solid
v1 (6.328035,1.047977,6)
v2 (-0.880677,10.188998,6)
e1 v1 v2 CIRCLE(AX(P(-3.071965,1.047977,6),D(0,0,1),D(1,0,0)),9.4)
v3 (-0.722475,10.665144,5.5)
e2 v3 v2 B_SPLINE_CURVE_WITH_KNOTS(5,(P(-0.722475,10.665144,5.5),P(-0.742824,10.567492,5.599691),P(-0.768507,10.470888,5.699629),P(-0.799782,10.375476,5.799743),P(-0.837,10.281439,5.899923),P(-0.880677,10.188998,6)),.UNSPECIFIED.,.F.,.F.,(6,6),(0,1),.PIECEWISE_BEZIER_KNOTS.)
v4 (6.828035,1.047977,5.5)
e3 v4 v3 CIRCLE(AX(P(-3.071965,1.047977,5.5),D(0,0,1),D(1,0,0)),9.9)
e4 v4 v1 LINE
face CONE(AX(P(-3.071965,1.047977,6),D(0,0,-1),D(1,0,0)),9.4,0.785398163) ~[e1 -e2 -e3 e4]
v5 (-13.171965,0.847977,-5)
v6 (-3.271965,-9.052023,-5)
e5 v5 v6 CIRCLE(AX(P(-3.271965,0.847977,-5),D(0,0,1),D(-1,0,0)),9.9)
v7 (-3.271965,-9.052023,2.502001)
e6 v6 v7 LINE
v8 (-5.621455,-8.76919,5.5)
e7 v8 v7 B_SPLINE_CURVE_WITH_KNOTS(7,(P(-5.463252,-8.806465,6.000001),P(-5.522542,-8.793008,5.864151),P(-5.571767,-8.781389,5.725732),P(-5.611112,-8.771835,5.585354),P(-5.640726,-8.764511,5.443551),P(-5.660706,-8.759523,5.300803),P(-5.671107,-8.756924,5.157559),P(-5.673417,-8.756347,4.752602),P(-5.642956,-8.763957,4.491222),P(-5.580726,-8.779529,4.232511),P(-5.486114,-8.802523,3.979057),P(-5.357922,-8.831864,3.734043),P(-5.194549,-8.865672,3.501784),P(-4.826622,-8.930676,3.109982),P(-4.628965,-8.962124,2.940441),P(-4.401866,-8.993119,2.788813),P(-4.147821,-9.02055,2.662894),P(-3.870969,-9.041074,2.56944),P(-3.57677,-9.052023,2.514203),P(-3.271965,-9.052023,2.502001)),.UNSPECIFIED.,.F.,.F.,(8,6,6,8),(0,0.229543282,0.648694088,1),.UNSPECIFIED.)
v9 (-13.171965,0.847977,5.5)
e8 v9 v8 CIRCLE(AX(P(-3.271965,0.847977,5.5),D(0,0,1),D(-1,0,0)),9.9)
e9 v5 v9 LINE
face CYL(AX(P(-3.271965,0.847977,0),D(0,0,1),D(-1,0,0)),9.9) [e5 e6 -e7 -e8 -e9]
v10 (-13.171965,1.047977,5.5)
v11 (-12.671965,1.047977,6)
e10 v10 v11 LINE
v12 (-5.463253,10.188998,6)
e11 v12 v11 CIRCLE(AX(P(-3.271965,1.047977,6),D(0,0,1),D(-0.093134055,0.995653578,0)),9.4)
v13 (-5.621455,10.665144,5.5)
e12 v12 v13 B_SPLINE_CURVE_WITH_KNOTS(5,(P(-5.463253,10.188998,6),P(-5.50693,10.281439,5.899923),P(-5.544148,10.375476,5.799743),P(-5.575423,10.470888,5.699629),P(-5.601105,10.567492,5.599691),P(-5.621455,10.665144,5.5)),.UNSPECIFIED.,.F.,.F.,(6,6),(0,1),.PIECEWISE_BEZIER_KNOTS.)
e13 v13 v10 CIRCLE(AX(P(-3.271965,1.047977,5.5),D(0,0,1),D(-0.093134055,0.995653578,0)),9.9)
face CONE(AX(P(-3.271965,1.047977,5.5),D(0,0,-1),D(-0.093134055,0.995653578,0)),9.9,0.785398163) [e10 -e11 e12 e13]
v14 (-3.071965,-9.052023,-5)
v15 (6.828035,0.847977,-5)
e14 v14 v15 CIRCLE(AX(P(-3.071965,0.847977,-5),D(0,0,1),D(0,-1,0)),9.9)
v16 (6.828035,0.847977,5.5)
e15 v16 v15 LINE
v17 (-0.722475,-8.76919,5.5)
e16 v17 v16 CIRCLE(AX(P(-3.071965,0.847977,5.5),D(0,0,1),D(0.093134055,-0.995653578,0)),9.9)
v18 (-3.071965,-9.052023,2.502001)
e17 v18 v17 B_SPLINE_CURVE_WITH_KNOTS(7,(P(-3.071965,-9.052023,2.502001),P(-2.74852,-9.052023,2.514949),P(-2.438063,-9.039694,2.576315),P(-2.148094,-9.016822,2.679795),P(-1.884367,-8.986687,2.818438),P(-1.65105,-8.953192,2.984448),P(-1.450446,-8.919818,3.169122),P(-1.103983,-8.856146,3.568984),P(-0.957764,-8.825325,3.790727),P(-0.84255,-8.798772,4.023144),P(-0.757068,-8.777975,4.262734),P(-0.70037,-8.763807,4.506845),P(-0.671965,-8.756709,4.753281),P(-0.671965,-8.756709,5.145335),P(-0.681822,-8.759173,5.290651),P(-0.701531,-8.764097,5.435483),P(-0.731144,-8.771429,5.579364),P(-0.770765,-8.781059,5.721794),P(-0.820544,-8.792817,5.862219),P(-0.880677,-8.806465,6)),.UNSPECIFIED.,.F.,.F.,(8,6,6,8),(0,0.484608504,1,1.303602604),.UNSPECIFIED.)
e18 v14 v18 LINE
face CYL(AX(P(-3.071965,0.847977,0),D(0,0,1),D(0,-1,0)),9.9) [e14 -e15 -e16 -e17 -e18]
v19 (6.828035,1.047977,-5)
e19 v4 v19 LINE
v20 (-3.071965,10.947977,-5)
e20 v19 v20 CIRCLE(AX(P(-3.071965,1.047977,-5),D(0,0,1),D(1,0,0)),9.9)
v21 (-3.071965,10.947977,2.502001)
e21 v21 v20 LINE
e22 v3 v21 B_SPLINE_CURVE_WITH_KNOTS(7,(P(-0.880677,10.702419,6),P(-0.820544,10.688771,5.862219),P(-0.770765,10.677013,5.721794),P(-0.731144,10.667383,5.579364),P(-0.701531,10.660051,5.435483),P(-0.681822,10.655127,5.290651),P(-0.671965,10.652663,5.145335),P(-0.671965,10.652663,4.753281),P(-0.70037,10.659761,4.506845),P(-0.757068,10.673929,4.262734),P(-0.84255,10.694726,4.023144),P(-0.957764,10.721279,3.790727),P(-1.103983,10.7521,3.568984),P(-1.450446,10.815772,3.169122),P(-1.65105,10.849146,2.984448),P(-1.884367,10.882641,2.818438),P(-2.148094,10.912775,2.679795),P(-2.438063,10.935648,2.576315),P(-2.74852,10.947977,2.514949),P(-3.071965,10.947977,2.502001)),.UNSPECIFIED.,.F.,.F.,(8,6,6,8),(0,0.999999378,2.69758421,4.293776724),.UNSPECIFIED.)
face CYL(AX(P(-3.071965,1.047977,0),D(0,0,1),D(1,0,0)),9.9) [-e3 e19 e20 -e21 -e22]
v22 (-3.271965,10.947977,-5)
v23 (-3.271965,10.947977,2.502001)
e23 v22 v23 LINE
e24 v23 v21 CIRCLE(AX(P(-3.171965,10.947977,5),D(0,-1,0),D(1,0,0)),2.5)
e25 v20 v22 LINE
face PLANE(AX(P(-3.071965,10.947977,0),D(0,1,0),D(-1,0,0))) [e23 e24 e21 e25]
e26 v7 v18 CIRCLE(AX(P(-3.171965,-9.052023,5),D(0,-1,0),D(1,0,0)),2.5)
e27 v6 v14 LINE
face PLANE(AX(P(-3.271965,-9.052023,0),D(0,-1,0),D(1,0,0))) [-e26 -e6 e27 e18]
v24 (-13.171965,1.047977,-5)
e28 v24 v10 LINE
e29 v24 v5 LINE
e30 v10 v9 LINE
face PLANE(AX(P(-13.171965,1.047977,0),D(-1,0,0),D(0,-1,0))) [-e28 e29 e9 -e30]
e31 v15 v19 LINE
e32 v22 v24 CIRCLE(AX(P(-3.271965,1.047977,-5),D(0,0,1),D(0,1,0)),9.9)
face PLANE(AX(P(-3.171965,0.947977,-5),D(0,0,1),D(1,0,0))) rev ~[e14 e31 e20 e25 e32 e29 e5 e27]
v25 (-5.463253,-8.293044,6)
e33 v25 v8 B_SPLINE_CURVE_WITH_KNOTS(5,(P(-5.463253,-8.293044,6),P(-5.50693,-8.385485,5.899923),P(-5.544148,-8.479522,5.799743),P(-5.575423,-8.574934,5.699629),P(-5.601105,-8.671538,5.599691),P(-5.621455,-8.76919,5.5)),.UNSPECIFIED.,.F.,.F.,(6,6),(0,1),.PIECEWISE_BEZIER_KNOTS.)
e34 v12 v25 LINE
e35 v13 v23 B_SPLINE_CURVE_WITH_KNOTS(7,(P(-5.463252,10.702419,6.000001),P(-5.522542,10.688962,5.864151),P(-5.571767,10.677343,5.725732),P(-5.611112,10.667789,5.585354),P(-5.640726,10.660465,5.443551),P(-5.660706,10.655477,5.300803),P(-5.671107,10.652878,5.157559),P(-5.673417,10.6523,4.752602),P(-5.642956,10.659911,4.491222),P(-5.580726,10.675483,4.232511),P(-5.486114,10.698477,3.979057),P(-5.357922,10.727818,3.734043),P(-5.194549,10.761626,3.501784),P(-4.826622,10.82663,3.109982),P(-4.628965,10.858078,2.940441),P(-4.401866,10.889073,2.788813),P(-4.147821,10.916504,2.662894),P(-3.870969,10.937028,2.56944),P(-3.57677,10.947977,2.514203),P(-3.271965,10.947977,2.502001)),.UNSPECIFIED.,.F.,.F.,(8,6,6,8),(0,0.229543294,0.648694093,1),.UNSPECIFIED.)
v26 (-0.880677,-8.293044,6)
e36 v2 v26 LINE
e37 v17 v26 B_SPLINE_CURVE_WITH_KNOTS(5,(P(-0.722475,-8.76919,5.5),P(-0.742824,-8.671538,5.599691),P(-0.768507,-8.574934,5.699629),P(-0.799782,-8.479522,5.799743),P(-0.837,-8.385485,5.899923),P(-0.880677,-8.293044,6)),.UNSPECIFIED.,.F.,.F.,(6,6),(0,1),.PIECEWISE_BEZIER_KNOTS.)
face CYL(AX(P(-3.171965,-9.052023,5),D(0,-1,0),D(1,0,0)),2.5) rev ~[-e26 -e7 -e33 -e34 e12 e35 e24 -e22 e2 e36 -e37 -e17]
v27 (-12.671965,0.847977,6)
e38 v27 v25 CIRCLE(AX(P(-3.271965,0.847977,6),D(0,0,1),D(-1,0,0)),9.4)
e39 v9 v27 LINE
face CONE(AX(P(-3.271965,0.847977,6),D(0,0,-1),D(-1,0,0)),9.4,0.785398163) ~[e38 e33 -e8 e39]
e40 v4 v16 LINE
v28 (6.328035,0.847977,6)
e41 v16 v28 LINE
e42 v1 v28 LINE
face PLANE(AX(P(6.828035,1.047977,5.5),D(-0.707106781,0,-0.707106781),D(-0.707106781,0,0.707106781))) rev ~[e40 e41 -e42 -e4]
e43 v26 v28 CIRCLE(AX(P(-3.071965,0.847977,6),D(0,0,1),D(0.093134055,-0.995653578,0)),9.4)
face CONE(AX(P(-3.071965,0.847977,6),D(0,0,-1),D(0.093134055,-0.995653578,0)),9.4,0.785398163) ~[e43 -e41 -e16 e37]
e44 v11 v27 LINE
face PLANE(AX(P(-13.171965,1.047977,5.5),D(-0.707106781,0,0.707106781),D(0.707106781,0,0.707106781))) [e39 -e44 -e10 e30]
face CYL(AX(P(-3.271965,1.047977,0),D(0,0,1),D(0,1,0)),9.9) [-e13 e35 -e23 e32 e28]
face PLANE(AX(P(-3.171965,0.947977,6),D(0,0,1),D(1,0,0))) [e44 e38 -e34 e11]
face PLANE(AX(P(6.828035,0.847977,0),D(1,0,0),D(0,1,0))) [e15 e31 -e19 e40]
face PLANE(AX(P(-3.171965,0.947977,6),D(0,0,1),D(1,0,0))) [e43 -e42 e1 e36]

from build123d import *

# Parameters (mm, degrees)
F1_DEPTH     = 6
F2_R         = 2.5
F3_DEPTH     = 25
F4_T1_DEPTH  = 0.2
F4_T4_ANGLE  = 84.656067133
F4_T6_ANGLE  = 84.656067133
F4_T8_ANGLE  = 84.656067133
F4_T10_ANGLE = 84.656067133
F5_DEPTH     = 5


# Not quite as in the source:
# - a fillet or chamfer that OpenCascade refuses, or shapes differently, is made with other operations: its cross-section is extruded or revolved along the edge and cut away or added


with BuildPart() as f1:
    # F0 (on Top) → F1 (new body)
    with BuildSketch(Plane.XY):
        with BuildLine():
            Line((-3.071964772, 10.9479769804), (-3.271964772, 10.9479769804))
            ThreePointArc((-3.271964772, 10.9479769804), (-10.2723219058, 8.0483341141), (-13.171964772, 1.0479769804))
            Line((-13.171964772, 1.0479769804), (-13.171964772, 0.8479769804))
            ThreePointArc((-13.171964772, 0.8479769804), (-10.2723219058, -6.1523801534), (-3.271964772, -9.0520230196))
            Line((-3.271964772, -9.0520230196), (-3.071964772, -9.0520230196))
            ThreePointArc((-3.071964772, -9.0520230196), (3.9283923617, -6.1523801534), (6.828035228, 0.8479769804))
            Line((6.828035228, 0.8479769804), (6.828035228, 1.0479769804))
            ThreePointArc((6.828035228, 1.0479769804), (3.9283923617, 8.0483341141), (-3.071964772, 10.9479769804))
        make_face()
    extrude(amount=F1_DEPTH)

    # F2 (on face) → F3 (cut)
    with BuildSketch(Plane.XZ.offset(9.0520230196)):
        with Locations((-3.171964772, 5)):
            Circle(F2_R)
    extrude(amount=-F3_DEPTH, mode=Mode.SUBTRACT)

    # F4: chamfer of 0.5 on 2 edges, made by hand

    # F4_s2 → F4_t1 (cut)
    with BuildSketch(Plane.XZ.offset(-1.0479769804)):
        Polygon((-13.171964772, 5.5), (-12.671964772, 6), (-13.171964772, 6), align=None)
        Polygon((6.828035228, 5.5), (6.328035228, 6), (6.828035228, 6), align=None)
    extrude(amount=F4_T1_DEPTH, mode=Mode.SUBTRACT)

    # F4_s3 → F4_t4 (revolve, cut)
    with BuildSketch(Plane.XZ.offset(-1.0479769804)):
        Polygon((6.328035228, 6), (6.828035228, 5.5), (6.828035228, 6), align=None)
    revolve(axis=Axis((-3.071964772, 1.0479769804, 6), (0, 0, 1)), revolution_arc=F4_T4_ANGLE, mode=Mode.SUBTRACT)

    # F4_s5 → F4_t6 (revolve, cut)
    with BuildSketch(Plane(origin=(-3.1464057809, -0.2943167545, 0), x_dir=(0, 0, 1), z_dir=(0.9956535782, 0.0931340552, 0))):
        Polygon((5.5, -11.2481533781), (6, -10.7481533781), (6, -11.2481533781), align=None)
    revolve(axis=Axis((-3.271964772, 1.0479769804, 6), (0, 0, 1)), revolution_arc=F4_T6_ANGLE, mode=Mode.SUBTRACT)

    # F4_s7 → F4_t8 (revolve, cut)
    with BuildSketch(Plane.XZ.offset(-0.8479769804)):
        Polygon((-12.671964772, 6), (-13.171964772, 5.5), (-13.171964772, 6), align=None)
    revolve(axis=Axis((-3.271964772, 0.8479769804, 6), (0, 0, 1)), revolution_arc=F4_T8_ANGLE, mode=Mode.SUBTRACT)

    # F4_s9 → F4_t10 (revolve, cut)
    with BuildSketch(Plane(origin=(-2.9666864224, -0.2775056939, 0), x_dir=(0, 0, 1), z_dir=(-0.9956535782, -0.0931340552, 0))):
        Polygon((6, -8.2696041486), (5.5, -8.7696041486), (6, -8.7696041486), align=None)
    revolve(axis=Axis((-3.071964772, 0.8479769804, 6), (0, 0, 1)), revolution_arc=F4_T10_ANGLE, mode=Mode.SUBTRACT)

    # F5 (add): a face of the model
    f5_faces = [f1.faces().sort_by_distance(p)[0] for p in [
        (-3.171964772, 0.9479769804, 0),
    ]]
    extrude(f5_faces, amount=F5_DEPTH)


solid = f1.part
